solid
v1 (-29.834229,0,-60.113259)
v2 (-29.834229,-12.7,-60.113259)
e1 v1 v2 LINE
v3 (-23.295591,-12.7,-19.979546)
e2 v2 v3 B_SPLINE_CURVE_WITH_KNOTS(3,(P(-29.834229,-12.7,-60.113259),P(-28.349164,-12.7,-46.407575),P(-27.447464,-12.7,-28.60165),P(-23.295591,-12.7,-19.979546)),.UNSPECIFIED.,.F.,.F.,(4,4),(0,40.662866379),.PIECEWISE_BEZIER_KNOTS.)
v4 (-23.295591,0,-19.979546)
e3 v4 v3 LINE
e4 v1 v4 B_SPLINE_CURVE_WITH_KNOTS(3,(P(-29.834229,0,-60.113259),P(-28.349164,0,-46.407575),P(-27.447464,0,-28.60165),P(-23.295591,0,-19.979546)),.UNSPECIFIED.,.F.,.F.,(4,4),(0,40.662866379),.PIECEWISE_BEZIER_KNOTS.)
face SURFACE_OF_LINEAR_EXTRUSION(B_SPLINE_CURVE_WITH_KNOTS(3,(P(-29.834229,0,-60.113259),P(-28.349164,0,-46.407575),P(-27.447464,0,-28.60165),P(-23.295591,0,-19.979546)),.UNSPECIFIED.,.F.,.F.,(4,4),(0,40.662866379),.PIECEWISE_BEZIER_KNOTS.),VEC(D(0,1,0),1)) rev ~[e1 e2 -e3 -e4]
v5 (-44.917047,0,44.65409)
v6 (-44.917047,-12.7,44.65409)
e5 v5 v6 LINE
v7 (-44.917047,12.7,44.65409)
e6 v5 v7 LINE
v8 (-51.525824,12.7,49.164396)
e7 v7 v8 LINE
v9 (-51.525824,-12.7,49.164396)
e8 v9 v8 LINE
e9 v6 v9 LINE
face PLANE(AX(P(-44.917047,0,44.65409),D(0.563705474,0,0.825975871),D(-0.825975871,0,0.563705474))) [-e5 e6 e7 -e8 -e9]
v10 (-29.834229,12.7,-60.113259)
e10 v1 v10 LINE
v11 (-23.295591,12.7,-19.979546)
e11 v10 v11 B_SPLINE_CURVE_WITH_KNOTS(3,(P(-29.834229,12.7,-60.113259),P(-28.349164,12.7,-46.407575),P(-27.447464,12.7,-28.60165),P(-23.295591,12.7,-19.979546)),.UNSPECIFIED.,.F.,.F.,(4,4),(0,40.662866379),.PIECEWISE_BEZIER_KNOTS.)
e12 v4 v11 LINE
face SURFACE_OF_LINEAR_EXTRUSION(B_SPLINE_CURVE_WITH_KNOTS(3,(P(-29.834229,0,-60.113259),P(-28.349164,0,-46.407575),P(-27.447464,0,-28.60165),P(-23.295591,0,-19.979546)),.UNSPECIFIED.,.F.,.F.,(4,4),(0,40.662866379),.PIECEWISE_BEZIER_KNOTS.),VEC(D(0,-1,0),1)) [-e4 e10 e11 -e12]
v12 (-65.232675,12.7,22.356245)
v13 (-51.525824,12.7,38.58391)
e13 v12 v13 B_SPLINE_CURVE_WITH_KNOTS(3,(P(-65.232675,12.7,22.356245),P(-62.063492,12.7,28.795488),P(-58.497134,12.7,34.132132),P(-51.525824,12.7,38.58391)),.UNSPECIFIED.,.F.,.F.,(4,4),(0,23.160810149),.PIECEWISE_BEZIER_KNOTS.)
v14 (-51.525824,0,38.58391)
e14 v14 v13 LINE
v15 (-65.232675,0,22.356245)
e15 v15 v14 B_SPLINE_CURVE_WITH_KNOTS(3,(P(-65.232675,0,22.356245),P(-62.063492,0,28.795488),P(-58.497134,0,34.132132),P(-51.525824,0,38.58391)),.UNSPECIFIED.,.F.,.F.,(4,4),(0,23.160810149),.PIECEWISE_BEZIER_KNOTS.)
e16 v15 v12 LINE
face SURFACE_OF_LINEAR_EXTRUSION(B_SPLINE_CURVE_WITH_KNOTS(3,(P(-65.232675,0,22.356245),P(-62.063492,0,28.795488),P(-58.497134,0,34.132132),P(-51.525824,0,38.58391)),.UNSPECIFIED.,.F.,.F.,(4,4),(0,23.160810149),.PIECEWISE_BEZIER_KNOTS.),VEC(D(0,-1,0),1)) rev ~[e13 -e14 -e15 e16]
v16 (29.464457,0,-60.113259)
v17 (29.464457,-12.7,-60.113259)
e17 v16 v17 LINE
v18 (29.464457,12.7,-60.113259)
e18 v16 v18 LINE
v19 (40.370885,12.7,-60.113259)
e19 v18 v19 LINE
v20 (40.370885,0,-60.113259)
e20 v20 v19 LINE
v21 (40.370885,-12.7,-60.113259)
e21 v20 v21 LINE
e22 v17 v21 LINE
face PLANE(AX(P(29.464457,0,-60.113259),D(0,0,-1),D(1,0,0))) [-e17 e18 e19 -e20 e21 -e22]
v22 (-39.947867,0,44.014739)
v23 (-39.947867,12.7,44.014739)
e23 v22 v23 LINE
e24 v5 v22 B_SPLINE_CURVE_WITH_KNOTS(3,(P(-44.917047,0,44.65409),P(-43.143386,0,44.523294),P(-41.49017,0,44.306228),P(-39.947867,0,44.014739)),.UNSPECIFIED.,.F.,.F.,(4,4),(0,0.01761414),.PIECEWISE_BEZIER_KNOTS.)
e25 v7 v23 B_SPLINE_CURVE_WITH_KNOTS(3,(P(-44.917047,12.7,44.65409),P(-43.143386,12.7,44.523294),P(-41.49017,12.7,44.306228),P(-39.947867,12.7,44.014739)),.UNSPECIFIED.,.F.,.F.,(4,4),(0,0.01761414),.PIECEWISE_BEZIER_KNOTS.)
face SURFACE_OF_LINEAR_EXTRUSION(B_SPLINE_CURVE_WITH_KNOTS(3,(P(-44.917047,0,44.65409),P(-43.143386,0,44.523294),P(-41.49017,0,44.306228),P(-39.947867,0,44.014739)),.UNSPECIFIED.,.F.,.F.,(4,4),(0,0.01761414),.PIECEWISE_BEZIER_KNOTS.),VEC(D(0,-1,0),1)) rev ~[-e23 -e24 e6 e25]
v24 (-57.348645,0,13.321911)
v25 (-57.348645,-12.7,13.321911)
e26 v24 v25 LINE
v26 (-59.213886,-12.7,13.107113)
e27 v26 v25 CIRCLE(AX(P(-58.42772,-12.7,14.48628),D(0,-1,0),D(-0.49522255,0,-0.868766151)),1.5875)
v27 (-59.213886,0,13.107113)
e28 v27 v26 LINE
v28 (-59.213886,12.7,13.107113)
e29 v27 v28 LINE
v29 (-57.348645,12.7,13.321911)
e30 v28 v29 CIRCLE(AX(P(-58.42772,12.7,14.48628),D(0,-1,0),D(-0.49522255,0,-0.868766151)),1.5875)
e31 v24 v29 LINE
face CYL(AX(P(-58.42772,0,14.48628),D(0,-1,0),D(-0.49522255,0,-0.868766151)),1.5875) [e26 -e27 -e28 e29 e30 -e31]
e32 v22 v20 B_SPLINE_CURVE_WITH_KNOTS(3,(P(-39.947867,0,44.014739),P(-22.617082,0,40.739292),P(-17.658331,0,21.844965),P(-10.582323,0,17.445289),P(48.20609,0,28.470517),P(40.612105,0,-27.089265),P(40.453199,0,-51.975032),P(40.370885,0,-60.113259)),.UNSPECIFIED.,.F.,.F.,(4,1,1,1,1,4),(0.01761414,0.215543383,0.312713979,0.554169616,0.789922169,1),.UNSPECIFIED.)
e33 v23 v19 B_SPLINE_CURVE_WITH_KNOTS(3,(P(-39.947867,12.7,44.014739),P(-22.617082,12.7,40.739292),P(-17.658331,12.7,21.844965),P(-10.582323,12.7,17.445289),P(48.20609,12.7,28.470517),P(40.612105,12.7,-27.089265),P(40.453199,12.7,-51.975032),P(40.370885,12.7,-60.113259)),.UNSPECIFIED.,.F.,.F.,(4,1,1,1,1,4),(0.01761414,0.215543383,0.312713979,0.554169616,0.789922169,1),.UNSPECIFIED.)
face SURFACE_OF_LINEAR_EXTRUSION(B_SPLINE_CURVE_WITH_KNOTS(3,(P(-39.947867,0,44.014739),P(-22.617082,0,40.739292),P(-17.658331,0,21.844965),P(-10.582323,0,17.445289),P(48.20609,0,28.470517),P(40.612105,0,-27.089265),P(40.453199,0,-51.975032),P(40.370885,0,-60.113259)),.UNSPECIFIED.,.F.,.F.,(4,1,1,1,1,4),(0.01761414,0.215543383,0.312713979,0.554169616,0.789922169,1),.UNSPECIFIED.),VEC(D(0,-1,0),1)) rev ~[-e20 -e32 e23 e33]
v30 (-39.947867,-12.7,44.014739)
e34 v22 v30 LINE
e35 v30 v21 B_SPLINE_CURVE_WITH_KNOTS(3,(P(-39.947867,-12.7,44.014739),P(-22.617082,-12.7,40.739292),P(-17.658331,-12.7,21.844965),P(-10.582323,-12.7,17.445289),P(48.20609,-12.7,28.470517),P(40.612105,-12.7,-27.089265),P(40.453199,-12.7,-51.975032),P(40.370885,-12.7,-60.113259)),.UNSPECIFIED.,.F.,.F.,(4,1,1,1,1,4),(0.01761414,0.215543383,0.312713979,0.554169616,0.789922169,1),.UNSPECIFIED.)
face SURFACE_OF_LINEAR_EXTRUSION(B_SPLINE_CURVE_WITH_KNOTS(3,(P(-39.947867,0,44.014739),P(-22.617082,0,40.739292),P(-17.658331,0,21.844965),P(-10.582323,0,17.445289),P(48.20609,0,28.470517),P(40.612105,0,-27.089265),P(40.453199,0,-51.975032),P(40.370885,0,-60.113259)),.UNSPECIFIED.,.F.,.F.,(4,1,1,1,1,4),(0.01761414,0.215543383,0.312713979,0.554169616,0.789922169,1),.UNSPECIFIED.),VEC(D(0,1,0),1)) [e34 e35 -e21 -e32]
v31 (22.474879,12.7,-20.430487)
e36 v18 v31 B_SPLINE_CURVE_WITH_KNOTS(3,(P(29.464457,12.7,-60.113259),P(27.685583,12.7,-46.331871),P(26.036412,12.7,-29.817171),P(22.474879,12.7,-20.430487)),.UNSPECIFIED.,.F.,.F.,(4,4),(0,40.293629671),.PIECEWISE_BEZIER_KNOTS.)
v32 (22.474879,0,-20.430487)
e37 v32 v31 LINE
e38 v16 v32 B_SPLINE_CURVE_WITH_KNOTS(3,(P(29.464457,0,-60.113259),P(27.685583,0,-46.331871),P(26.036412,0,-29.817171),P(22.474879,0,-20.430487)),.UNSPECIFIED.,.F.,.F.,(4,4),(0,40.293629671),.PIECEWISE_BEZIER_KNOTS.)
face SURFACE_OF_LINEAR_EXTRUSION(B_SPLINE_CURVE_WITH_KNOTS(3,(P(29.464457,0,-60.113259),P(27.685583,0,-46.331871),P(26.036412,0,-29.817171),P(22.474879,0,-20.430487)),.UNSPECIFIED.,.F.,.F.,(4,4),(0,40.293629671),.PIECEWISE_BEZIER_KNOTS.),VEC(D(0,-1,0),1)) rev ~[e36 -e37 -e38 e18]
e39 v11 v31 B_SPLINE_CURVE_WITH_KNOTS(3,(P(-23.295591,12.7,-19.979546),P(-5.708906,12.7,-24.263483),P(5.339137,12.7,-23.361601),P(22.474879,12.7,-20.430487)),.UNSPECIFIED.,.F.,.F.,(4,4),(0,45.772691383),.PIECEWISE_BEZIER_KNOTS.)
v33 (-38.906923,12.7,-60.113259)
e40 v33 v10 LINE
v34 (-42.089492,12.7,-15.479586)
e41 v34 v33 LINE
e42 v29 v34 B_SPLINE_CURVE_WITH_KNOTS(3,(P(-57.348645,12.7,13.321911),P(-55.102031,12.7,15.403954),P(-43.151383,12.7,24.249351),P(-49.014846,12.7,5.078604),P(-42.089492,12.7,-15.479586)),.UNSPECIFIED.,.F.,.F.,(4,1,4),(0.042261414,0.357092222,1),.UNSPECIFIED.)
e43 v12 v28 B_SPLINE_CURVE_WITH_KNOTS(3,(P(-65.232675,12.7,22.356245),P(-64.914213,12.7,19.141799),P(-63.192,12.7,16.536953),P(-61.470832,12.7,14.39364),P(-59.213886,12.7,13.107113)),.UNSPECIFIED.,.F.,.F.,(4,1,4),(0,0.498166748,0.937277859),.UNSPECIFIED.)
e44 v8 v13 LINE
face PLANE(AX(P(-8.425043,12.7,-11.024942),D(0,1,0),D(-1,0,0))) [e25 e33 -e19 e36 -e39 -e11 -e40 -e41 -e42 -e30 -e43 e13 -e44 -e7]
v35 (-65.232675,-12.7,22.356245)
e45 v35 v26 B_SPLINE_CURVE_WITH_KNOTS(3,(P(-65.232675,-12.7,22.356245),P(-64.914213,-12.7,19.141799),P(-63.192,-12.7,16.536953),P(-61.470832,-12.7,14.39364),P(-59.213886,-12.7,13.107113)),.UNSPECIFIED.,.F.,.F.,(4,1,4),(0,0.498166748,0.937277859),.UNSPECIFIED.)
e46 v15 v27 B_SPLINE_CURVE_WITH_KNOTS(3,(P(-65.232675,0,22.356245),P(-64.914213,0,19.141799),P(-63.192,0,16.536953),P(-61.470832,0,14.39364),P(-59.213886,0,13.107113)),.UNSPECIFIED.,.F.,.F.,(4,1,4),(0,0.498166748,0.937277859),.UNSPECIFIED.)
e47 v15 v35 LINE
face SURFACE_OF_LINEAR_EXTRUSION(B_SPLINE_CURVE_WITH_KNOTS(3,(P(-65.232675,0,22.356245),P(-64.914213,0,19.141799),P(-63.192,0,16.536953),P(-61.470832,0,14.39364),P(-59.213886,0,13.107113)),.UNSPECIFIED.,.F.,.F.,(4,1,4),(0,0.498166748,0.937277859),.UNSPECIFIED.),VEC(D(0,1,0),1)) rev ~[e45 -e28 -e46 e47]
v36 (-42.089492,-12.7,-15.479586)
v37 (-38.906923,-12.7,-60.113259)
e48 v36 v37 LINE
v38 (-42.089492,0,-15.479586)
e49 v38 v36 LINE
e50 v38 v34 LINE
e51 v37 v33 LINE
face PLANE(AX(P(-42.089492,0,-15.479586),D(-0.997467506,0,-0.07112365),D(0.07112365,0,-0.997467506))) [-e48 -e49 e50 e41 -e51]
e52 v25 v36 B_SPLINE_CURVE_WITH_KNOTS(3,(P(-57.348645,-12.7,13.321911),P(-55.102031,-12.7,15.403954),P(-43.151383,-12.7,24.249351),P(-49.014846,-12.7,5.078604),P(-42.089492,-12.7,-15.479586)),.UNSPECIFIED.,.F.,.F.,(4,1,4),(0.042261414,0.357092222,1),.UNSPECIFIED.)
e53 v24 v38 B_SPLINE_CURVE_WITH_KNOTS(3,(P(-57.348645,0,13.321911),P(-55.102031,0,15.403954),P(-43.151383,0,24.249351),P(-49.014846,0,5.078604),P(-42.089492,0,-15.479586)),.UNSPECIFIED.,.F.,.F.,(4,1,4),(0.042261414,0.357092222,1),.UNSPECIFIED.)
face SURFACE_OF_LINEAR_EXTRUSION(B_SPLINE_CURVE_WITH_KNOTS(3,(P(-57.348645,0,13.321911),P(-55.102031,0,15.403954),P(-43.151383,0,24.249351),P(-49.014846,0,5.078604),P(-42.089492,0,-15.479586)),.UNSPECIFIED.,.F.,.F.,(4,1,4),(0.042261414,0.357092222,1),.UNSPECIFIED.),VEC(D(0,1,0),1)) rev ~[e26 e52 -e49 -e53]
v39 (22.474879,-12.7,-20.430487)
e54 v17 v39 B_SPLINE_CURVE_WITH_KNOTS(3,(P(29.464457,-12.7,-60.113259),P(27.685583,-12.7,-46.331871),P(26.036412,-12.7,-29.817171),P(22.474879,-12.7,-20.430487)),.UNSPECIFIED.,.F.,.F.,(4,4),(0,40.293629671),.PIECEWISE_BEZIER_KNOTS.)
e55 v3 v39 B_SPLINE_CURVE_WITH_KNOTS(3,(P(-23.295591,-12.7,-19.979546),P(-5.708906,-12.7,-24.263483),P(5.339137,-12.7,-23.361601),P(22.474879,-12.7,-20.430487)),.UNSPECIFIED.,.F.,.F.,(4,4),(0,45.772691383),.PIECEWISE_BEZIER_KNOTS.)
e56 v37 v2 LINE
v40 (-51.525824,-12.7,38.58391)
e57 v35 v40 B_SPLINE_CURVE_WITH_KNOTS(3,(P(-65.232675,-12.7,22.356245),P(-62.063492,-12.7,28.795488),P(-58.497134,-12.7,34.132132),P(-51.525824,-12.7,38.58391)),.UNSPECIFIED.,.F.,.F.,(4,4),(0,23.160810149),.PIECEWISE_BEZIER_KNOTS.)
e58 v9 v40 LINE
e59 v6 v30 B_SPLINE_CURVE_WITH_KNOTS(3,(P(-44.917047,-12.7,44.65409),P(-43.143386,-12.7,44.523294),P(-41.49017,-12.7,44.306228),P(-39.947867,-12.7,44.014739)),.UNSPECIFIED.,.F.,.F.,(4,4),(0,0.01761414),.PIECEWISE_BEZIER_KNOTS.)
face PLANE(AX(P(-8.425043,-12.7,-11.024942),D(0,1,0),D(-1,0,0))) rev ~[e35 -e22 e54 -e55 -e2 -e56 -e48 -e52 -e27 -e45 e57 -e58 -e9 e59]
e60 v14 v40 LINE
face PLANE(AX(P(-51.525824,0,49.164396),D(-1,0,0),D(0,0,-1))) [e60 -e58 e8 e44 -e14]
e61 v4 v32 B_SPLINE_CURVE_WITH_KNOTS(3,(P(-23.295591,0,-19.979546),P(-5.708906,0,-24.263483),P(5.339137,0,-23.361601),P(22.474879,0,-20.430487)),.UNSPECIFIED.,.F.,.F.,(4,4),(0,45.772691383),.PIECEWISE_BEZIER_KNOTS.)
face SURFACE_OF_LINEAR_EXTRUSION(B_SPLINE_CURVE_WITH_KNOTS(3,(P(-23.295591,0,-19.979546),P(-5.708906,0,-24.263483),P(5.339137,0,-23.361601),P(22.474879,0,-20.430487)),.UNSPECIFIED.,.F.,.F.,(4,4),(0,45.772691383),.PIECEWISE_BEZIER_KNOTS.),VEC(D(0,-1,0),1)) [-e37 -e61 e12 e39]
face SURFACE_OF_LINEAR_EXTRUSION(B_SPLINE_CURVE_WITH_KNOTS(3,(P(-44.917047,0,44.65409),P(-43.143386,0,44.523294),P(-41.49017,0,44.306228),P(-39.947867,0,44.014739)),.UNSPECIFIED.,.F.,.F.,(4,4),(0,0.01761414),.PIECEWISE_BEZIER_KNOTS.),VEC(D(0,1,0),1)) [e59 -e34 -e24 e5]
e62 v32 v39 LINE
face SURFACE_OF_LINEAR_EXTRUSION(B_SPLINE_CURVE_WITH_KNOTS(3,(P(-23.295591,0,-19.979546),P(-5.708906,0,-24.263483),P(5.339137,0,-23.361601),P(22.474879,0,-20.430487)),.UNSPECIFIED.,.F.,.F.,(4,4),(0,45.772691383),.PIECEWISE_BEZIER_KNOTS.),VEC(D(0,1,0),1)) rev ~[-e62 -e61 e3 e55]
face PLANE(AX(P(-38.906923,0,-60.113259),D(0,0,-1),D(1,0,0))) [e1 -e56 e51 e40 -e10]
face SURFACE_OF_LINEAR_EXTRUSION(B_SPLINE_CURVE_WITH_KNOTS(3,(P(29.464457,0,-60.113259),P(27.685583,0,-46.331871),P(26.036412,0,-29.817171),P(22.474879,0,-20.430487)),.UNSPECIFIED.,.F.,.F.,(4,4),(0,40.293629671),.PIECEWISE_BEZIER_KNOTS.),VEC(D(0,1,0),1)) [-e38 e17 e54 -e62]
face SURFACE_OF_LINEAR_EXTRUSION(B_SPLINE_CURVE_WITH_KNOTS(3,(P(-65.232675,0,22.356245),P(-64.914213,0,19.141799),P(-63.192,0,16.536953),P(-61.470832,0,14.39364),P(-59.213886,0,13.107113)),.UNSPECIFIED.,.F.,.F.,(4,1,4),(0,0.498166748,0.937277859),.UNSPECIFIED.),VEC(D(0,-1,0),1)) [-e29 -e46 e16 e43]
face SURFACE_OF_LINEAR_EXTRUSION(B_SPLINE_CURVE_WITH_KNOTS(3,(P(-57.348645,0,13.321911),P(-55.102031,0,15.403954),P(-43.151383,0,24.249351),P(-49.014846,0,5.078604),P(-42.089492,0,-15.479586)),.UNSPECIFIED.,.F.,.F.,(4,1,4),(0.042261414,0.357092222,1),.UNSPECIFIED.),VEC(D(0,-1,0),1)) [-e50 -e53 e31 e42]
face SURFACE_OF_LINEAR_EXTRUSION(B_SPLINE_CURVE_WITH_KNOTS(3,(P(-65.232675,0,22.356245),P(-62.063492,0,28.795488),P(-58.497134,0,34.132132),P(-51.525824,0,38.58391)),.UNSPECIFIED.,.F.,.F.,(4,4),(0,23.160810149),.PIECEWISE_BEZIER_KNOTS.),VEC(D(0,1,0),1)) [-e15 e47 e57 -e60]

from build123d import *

# Parameters (mm, degrees)
F1_DEPTH = 12.7


with BuildPart() as f1:
    # F0 (on Front) → F1 (new body, symmetric)
    with BuildSketch(Plane.XZ):
        with BuildLine():
            add(Edge.make_bspline(
                [(29.4644571841, -60.1132586598), (27.6855829591, -46.3318706801), (26.0364115238, -29.8171713948), (22.4748793989, -20.4304866493)],
                knots=[0, 0, 0, 0, 40.2936296709, 40.2936296709, 40.2936296709, 40.2936296709], degree=3))
            Line((29.4644571841, -60.1132586598), (40.3708852828, -60.1132586598))
            add(Edge.make_bspline(
                [(-39.9478672487, 44.0147390983), (-22.6170819874, 40.7392920594), (-17.6583308267, 21.8449652817), (-10.5823233679, 17.4452892369), (48.2060896937, 28.4705173137), (40.6121053954, -27.0892647533), (40.4531992639, -51.9750322816), (40.3708852828, -60.1132586598)],
                knots=[0.0176141395, 0.0176141395, 0.0176141395, 0.0176141395, 0.2155433835, 0.3127139787, 0.5541696156, 0.7899221691, 1, 1, 1, 1], degree=3))
            add(Edge.make_bspline(
                [(-51.525823772, 38.5839095885), (-48.427228892, 40.5626276502), (-44.6559490871, 42.3665309751), (-39.9478672487, 44.0147390983)],
                knots=[23.1608101494, 23.1608101494, 23.1608101494, 23.1608101494, 33.4552840805, 33.4552840805, 33.4552840805, 33.4552840805], degree=3))
            add(Edge.make_bspline(
                [(-65.2326749397, 22.3562452086), (-62.0634924721, 28.7954880253), (-58.4971336441, 34.1321315111), (-51.525823772, 38.5839095885)],
                knots=[0, 0, 0, 0, 23.1608101494, 23.1608101494, 23.1608101494, 23.1608101494], degree=3))
            add(Edge.make_bspline(
                [(-65.2326749397, 22.3562452086), (-64.9142132763, 19.1417994226), (-63.1920002018, 16.5369528749), (-61.4708318004, 14.3936398975), (-59.2138856774, 13.1071134676)],
                knots=[0, 0, 0, 0, 0.4981667475, 0.9372778592, 0.9372778592, 0.9372778592, 0.9372778592], degree=3))
            ThreePointArc((-59.2138856774, 13.1071134676), (-58.2461064449, 12.9092024326), (-57.3486451177, 13.3219112729))
            add(Edge.make_bspline(
                [(-57.3486451177, 13.3219112729), (-55.1020312441, 15.4039535235), (-43.1513826069, 24.2493514779), (-49.0148457206, 5.0786043936), (-42.0894920826, -15.4795860872)],
                knots=[0.0422614145, 0.0422614145, 0.0422614145, 0.0422614145, 0.3570922222, 1, 1, 1, 1], degree=3))
            Line((-42.0894920826, -15.4795860872), (-38.9069225571, -60.1132586598))
            Line((-38.9069225571, -60.1132586598), (-29.8342294991, -60.1132586598))
            add(Edge.make_bspline(
                [(-29.8342294991, -60.1132586598), (-28.3491642525, -46.4075747877), (-27.4474639446, -28.6016501486), (-23.295590654, -19.9795458466)],
                knots=[0, 0, 0, 0, 40.6628663786, 40.6628663786, 40.6628663786, 40.6628663786], degree=3))
            add(Edge.make_bspline(
                [(-23.295590654, -19.9795458466), (-5.7089058682, -24.2634825408), (5.3391372785, -23.3616009355), (22.4748793989, -20.4304866493)],
                knots=[0, 0, 0, 0, 45.7726913834, 45.7726913834, 45.7726913834, 45.7726913834], degree=3))
        make_face()
        with BuildLine():
            add(Edge.make_bspline(
                [(-51.525823772, 38.5839095885), (-48.427228892, 40.5626276502), (-44.6559490871, 42.3665309751), (-39.9478672487, 44.0147390983)],
                knots=[23.1608101494, 23.1608101494, 23.1608101494, 23.1608101494, 33.4552840805, 33.4552840805, 33.4552840805, 33.4552840805], degree=3))
            add(Edge.make_bspline(
                [(-44.9170466202, 44.6540898628), (-43.143386035, 44.5232937495), (-41.4901702624, 44.306228016), (-39.9478672487, 44.0147390983)],
                knots=[0, 0, 0, 0, 0.0176141395, 0.0176141395, 0.0176141395, 0.0176141395], degree=3))
            Line((-44.9170466202, 44.6540898628), (-51.525823772, 49.1643957794))
            Line((-51.525823772, 49.1643957794), (-51.525823772, 38.5839095885))
        make_face()
    extrude(amount=F1_DEPTH, both=True)


solid = f1.part
